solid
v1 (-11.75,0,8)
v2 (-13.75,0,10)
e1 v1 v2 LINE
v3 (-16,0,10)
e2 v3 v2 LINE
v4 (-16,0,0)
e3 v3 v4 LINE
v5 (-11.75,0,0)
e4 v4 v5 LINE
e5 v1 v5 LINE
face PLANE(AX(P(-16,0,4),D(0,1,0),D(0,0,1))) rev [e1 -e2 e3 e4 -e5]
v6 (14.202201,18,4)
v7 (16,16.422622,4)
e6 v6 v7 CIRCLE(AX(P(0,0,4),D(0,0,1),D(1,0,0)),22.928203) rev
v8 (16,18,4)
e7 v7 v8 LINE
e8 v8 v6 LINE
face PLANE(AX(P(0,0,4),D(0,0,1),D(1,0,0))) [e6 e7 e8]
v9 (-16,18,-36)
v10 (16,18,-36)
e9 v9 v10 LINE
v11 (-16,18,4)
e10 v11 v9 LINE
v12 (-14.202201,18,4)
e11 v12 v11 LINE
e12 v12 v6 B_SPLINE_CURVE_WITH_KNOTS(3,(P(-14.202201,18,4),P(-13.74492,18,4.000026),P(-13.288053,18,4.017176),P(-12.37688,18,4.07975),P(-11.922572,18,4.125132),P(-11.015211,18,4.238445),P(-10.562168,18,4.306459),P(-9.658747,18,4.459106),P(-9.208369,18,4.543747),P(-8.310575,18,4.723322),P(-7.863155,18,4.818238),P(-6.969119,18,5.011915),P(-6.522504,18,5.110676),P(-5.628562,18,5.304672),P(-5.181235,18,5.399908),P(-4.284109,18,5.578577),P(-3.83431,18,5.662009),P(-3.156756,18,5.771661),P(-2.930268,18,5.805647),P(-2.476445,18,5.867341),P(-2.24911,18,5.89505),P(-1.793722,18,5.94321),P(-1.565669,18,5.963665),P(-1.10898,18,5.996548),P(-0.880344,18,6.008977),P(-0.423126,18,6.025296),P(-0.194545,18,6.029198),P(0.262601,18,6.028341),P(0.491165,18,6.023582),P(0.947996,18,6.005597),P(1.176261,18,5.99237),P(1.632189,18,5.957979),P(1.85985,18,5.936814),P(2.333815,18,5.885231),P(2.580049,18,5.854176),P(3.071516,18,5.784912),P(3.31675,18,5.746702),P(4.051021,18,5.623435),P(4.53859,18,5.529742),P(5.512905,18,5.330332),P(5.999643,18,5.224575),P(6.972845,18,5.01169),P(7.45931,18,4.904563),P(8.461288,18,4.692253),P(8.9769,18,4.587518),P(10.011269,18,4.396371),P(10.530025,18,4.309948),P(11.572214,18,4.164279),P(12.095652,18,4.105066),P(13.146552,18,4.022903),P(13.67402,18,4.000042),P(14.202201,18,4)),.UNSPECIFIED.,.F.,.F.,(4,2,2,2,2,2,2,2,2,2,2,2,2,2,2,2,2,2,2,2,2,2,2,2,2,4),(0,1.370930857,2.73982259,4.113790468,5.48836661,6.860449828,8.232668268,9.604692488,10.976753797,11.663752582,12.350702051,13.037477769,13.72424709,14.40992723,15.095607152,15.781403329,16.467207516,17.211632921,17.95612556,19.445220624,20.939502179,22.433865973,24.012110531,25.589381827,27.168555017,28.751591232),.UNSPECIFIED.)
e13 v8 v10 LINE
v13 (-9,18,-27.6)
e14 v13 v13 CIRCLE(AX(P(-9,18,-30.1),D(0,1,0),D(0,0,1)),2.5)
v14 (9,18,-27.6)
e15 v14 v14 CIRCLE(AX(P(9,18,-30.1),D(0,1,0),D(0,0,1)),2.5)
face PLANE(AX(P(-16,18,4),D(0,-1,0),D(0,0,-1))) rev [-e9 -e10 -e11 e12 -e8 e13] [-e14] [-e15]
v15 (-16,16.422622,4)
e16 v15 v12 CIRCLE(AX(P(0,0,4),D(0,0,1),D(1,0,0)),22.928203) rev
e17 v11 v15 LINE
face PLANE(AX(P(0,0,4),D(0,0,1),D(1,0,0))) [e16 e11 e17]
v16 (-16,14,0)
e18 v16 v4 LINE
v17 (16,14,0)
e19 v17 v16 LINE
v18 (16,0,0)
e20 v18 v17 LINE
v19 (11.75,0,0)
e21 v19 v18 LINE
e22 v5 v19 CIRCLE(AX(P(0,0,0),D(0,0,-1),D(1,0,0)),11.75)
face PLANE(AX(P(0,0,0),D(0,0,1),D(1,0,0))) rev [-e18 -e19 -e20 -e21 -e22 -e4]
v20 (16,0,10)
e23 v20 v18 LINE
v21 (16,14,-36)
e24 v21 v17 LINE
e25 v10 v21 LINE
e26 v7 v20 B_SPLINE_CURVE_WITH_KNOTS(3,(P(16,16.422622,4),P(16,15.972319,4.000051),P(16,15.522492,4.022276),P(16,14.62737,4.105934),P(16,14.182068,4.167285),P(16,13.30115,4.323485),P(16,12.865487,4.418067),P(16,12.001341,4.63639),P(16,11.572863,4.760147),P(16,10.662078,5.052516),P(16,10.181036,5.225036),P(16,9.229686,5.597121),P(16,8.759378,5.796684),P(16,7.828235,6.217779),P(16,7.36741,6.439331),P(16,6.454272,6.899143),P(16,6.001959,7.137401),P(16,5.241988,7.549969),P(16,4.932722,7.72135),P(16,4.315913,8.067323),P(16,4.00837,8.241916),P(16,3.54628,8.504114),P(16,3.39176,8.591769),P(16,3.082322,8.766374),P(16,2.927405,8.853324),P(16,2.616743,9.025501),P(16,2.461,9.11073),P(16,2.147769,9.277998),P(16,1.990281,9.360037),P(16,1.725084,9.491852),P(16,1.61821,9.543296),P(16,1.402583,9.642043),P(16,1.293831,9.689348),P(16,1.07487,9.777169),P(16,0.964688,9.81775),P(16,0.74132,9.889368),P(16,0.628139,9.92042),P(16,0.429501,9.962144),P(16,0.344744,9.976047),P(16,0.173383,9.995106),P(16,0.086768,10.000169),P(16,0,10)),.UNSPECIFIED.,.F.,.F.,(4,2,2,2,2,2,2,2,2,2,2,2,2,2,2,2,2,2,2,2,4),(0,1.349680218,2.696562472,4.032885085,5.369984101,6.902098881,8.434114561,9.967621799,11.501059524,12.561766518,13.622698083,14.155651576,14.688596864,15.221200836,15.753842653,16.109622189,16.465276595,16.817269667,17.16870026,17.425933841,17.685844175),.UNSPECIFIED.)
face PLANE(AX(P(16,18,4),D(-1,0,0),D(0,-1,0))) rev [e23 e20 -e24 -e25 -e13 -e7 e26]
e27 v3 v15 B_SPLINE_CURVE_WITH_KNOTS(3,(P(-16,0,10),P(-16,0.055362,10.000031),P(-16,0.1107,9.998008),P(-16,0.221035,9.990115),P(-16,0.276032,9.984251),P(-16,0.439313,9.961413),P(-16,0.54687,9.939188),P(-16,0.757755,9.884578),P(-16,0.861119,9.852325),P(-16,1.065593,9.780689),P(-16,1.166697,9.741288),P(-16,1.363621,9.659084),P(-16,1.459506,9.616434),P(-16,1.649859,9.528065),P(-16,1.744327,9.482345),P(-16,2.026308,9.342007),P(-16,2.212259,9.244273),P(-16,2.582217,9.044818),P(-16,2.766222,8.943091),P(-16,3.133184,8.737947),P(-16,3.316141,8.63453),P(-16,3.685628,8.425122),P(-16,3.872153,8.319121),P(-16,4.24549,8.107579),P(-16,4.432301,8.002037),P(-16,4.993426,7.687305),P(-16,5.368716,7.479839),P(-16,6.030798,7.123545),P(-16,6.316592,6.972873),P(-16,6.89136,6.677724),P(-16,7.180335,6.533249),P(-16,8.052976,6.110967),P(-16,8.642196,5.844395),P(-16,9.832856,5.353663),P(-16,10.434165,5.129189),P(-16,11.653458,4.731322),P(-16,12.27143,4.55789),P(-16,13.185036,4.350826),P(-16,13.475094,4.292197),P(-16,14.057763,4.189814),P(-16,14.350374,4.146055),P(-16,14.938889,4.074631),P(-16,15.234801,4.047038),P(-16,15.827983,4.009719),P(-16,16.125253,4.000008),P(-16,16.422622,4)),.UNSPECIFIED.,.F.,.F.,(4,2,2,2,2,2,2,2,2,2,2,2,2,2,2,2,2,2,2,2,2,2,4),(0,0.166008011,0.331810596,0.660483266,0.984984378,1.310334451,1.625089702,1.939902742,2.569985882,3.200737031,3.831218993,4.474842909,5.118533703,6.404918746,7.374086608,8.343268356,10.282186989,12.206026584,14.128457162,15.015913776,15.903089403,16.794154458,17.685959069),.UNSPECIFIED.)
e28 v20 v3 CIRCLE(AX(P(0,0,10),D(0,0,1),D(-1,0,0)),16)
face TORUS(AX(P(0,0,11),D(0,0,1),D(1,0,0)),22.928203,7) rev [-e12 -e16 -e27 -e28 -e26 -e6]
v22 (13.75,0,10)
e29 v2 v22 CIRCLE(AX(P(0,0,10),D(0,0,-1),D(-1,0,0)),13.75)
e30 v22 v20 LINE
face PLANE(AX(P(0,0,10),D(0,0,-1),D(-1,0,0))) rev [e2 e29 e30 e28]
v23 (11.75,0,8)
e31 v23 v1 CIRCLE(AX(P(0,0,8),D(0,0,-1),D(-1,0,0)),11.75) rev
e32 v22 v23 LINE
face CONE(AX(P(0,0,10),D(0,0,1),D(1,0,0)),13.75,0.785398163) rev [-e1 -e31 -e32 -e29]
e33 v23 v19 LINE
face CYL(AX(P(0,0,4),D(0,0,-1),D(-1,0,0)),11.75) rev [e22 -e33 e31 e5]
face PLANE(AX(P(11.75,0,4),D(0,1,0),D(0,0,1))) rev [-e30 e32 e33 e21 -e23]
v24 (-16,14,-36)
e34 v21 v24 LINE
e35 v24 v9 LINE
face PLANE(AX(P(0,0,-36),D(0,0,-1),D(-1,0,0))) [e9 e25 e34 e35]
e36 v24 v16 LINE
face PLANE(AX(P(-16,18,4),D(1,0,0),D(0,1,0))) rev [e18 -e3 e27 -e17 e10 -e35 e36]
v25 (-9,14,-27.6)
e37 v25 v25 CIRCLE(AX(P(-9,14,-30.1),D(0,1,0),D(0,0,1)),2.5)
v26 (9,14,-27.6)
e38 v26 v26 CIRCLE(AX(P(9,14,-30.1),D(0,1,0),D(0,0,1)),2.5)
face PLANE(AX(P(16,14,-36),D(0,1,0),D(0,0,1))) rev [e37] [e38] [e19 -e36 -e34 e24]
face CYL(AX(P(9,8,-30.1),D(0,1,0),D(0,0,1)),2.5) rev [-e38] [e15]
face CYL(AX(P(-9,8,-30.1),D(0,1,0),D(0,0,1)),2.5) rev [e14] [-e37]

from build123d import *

# Parameters (mm, degrees)
BOSS_EXTRU_1_DEPTH      = 4
ESQUISSE2_W             = 32
ESQUISSE2_H             = 4
BOSS_EXTRU_2_DEPTH      = 36
BOSS_EXTRU_3_DEPTH      = 6
CONG_1_R                = 7
CHANFREIN1_SIZE         = 2
ESQUISSE4_R             = 2.5
ENL_V_MAT_EXTRU_1_DEPTH = 10


with BuildPart() as part:
    # Esquisse1 → Boss.-Extru.1 (new body)
    with BuildSketch(Plane.XY):
        with BuildLine():
            Line((-16, 18), (16, 18))
            Line((16, 18), (16, 0))
            Line((16, 0), (11.75, 0))
            ThreePointArc((11.75, 0), (0, 11.75), (-11.75, 0))
            Line((-11.75, 0), (-16, 0))
            Line((-16, 0), (-16, 18))
        make_face()
    extrude(amount=BOSS_EXTRU_1_DEPTH)

    # Esquisse2 → Boss.-Extru.2 (add)
    with BuildSketch(Plane(origin=(0, 0, 0), x_dir=(-1, 0, 0), z_dir=(0, 0, -1))):
        with Locations((0, 16)):
            Rectangle(ESQUISSE2_W, ESQUISSE2_H)
    extrude(amount=BOSS_EXTRU_2_DEPTH)

    # Esquisse3 → Boss.-Extru.3 (add)
    with BuildSketch(Plane.XY.offset(4)):
        with BuildLine():
            Line((-16, 0), (-11.75, 0))
            ThreePointArc((-11.75, 0), (0, 11.75), (11.75, 0))
            Line((11.75, 0), (16, 0))
            ThreePointArc((16, 0), (0, 16), (-16, 0))
        make_face()
    extrude(amount=BOSS_EXTRU_3_DEPTH)

    # Congé1
    # the kernel refuses this fillet: 7 mm, written as the material it adds along each edge
    with BuildSketch(Plane(origin=(0, 0, 4), x_dir=(1, 0, 0), z_dir=(0, -1, 0))) as cong_1_piece_1_section:
        with BuildLine():
            CenterArc((22.92820323, 7), CONG_1_R, 188.213210702, 81.786789298)
            Line((16, 6), (16, 0))
            Line((16, 0), (22.92820323, 0))
        make_face()
    cong_1_piece_1 = revolve(axis=Axis((0, 0, 4), (0, 0, 1)), revolution_arc=180, mode=Mode.PRIVATE)
    cong_1_piece_1 = split(cong_1_piece_1, bisect_by=Plane(origin=(0, 18, 4), z_dir=(0, -1, 0)), keep=Keep.TOP, mode=Mode.PRIVATE)
    cong_1_piece_1 = split(cong_1_piece_1, bisect_by=Plane(origin=(16, 0, 4), z_dir=(-1, 0, 0)), keep=Keep.TOP, mode=Mode.PRIVATE)
    cong_1_piece_1 = split(cong_1_piece_1, bisect_by=Plane(origin=(-16, 0, 4), z_dir=(1, 0, 0)), keep=Keep.TOP, mode=Mode.PRIVATE)
    add(cong_1_piece_1)

    # Chanfrein1
    chanfrein1_edges = [part.edges().sort_by_distance(p)[0] for p in [
        (0, 11.75, 10),
    ]]
    chamfer(chanfrein1_edges, length=CHANFREIN1_SIZE)

    # Esquisse4 → Enlèv. mat.-Extru.1 (cut)
    with BuildSketch(Plane(origin=(0, 18, 0), x_dir=(1, 0, 0), z_dir=(0, 1, 0))):
        with Locations(Location((9, 30.1, 0), (0, 0, 270))):
            Circle(ESQUISSE4_R)
        with Locations(Location((-9, 30.1, 0), (0, 0, 270))):
            Circle(ESQUISSE4_R)
    extrude(amount=-ENL_V_MAT_EXTRU_1_DEPTH, mode=Mode.SUBTRACT)


solid = part.part
